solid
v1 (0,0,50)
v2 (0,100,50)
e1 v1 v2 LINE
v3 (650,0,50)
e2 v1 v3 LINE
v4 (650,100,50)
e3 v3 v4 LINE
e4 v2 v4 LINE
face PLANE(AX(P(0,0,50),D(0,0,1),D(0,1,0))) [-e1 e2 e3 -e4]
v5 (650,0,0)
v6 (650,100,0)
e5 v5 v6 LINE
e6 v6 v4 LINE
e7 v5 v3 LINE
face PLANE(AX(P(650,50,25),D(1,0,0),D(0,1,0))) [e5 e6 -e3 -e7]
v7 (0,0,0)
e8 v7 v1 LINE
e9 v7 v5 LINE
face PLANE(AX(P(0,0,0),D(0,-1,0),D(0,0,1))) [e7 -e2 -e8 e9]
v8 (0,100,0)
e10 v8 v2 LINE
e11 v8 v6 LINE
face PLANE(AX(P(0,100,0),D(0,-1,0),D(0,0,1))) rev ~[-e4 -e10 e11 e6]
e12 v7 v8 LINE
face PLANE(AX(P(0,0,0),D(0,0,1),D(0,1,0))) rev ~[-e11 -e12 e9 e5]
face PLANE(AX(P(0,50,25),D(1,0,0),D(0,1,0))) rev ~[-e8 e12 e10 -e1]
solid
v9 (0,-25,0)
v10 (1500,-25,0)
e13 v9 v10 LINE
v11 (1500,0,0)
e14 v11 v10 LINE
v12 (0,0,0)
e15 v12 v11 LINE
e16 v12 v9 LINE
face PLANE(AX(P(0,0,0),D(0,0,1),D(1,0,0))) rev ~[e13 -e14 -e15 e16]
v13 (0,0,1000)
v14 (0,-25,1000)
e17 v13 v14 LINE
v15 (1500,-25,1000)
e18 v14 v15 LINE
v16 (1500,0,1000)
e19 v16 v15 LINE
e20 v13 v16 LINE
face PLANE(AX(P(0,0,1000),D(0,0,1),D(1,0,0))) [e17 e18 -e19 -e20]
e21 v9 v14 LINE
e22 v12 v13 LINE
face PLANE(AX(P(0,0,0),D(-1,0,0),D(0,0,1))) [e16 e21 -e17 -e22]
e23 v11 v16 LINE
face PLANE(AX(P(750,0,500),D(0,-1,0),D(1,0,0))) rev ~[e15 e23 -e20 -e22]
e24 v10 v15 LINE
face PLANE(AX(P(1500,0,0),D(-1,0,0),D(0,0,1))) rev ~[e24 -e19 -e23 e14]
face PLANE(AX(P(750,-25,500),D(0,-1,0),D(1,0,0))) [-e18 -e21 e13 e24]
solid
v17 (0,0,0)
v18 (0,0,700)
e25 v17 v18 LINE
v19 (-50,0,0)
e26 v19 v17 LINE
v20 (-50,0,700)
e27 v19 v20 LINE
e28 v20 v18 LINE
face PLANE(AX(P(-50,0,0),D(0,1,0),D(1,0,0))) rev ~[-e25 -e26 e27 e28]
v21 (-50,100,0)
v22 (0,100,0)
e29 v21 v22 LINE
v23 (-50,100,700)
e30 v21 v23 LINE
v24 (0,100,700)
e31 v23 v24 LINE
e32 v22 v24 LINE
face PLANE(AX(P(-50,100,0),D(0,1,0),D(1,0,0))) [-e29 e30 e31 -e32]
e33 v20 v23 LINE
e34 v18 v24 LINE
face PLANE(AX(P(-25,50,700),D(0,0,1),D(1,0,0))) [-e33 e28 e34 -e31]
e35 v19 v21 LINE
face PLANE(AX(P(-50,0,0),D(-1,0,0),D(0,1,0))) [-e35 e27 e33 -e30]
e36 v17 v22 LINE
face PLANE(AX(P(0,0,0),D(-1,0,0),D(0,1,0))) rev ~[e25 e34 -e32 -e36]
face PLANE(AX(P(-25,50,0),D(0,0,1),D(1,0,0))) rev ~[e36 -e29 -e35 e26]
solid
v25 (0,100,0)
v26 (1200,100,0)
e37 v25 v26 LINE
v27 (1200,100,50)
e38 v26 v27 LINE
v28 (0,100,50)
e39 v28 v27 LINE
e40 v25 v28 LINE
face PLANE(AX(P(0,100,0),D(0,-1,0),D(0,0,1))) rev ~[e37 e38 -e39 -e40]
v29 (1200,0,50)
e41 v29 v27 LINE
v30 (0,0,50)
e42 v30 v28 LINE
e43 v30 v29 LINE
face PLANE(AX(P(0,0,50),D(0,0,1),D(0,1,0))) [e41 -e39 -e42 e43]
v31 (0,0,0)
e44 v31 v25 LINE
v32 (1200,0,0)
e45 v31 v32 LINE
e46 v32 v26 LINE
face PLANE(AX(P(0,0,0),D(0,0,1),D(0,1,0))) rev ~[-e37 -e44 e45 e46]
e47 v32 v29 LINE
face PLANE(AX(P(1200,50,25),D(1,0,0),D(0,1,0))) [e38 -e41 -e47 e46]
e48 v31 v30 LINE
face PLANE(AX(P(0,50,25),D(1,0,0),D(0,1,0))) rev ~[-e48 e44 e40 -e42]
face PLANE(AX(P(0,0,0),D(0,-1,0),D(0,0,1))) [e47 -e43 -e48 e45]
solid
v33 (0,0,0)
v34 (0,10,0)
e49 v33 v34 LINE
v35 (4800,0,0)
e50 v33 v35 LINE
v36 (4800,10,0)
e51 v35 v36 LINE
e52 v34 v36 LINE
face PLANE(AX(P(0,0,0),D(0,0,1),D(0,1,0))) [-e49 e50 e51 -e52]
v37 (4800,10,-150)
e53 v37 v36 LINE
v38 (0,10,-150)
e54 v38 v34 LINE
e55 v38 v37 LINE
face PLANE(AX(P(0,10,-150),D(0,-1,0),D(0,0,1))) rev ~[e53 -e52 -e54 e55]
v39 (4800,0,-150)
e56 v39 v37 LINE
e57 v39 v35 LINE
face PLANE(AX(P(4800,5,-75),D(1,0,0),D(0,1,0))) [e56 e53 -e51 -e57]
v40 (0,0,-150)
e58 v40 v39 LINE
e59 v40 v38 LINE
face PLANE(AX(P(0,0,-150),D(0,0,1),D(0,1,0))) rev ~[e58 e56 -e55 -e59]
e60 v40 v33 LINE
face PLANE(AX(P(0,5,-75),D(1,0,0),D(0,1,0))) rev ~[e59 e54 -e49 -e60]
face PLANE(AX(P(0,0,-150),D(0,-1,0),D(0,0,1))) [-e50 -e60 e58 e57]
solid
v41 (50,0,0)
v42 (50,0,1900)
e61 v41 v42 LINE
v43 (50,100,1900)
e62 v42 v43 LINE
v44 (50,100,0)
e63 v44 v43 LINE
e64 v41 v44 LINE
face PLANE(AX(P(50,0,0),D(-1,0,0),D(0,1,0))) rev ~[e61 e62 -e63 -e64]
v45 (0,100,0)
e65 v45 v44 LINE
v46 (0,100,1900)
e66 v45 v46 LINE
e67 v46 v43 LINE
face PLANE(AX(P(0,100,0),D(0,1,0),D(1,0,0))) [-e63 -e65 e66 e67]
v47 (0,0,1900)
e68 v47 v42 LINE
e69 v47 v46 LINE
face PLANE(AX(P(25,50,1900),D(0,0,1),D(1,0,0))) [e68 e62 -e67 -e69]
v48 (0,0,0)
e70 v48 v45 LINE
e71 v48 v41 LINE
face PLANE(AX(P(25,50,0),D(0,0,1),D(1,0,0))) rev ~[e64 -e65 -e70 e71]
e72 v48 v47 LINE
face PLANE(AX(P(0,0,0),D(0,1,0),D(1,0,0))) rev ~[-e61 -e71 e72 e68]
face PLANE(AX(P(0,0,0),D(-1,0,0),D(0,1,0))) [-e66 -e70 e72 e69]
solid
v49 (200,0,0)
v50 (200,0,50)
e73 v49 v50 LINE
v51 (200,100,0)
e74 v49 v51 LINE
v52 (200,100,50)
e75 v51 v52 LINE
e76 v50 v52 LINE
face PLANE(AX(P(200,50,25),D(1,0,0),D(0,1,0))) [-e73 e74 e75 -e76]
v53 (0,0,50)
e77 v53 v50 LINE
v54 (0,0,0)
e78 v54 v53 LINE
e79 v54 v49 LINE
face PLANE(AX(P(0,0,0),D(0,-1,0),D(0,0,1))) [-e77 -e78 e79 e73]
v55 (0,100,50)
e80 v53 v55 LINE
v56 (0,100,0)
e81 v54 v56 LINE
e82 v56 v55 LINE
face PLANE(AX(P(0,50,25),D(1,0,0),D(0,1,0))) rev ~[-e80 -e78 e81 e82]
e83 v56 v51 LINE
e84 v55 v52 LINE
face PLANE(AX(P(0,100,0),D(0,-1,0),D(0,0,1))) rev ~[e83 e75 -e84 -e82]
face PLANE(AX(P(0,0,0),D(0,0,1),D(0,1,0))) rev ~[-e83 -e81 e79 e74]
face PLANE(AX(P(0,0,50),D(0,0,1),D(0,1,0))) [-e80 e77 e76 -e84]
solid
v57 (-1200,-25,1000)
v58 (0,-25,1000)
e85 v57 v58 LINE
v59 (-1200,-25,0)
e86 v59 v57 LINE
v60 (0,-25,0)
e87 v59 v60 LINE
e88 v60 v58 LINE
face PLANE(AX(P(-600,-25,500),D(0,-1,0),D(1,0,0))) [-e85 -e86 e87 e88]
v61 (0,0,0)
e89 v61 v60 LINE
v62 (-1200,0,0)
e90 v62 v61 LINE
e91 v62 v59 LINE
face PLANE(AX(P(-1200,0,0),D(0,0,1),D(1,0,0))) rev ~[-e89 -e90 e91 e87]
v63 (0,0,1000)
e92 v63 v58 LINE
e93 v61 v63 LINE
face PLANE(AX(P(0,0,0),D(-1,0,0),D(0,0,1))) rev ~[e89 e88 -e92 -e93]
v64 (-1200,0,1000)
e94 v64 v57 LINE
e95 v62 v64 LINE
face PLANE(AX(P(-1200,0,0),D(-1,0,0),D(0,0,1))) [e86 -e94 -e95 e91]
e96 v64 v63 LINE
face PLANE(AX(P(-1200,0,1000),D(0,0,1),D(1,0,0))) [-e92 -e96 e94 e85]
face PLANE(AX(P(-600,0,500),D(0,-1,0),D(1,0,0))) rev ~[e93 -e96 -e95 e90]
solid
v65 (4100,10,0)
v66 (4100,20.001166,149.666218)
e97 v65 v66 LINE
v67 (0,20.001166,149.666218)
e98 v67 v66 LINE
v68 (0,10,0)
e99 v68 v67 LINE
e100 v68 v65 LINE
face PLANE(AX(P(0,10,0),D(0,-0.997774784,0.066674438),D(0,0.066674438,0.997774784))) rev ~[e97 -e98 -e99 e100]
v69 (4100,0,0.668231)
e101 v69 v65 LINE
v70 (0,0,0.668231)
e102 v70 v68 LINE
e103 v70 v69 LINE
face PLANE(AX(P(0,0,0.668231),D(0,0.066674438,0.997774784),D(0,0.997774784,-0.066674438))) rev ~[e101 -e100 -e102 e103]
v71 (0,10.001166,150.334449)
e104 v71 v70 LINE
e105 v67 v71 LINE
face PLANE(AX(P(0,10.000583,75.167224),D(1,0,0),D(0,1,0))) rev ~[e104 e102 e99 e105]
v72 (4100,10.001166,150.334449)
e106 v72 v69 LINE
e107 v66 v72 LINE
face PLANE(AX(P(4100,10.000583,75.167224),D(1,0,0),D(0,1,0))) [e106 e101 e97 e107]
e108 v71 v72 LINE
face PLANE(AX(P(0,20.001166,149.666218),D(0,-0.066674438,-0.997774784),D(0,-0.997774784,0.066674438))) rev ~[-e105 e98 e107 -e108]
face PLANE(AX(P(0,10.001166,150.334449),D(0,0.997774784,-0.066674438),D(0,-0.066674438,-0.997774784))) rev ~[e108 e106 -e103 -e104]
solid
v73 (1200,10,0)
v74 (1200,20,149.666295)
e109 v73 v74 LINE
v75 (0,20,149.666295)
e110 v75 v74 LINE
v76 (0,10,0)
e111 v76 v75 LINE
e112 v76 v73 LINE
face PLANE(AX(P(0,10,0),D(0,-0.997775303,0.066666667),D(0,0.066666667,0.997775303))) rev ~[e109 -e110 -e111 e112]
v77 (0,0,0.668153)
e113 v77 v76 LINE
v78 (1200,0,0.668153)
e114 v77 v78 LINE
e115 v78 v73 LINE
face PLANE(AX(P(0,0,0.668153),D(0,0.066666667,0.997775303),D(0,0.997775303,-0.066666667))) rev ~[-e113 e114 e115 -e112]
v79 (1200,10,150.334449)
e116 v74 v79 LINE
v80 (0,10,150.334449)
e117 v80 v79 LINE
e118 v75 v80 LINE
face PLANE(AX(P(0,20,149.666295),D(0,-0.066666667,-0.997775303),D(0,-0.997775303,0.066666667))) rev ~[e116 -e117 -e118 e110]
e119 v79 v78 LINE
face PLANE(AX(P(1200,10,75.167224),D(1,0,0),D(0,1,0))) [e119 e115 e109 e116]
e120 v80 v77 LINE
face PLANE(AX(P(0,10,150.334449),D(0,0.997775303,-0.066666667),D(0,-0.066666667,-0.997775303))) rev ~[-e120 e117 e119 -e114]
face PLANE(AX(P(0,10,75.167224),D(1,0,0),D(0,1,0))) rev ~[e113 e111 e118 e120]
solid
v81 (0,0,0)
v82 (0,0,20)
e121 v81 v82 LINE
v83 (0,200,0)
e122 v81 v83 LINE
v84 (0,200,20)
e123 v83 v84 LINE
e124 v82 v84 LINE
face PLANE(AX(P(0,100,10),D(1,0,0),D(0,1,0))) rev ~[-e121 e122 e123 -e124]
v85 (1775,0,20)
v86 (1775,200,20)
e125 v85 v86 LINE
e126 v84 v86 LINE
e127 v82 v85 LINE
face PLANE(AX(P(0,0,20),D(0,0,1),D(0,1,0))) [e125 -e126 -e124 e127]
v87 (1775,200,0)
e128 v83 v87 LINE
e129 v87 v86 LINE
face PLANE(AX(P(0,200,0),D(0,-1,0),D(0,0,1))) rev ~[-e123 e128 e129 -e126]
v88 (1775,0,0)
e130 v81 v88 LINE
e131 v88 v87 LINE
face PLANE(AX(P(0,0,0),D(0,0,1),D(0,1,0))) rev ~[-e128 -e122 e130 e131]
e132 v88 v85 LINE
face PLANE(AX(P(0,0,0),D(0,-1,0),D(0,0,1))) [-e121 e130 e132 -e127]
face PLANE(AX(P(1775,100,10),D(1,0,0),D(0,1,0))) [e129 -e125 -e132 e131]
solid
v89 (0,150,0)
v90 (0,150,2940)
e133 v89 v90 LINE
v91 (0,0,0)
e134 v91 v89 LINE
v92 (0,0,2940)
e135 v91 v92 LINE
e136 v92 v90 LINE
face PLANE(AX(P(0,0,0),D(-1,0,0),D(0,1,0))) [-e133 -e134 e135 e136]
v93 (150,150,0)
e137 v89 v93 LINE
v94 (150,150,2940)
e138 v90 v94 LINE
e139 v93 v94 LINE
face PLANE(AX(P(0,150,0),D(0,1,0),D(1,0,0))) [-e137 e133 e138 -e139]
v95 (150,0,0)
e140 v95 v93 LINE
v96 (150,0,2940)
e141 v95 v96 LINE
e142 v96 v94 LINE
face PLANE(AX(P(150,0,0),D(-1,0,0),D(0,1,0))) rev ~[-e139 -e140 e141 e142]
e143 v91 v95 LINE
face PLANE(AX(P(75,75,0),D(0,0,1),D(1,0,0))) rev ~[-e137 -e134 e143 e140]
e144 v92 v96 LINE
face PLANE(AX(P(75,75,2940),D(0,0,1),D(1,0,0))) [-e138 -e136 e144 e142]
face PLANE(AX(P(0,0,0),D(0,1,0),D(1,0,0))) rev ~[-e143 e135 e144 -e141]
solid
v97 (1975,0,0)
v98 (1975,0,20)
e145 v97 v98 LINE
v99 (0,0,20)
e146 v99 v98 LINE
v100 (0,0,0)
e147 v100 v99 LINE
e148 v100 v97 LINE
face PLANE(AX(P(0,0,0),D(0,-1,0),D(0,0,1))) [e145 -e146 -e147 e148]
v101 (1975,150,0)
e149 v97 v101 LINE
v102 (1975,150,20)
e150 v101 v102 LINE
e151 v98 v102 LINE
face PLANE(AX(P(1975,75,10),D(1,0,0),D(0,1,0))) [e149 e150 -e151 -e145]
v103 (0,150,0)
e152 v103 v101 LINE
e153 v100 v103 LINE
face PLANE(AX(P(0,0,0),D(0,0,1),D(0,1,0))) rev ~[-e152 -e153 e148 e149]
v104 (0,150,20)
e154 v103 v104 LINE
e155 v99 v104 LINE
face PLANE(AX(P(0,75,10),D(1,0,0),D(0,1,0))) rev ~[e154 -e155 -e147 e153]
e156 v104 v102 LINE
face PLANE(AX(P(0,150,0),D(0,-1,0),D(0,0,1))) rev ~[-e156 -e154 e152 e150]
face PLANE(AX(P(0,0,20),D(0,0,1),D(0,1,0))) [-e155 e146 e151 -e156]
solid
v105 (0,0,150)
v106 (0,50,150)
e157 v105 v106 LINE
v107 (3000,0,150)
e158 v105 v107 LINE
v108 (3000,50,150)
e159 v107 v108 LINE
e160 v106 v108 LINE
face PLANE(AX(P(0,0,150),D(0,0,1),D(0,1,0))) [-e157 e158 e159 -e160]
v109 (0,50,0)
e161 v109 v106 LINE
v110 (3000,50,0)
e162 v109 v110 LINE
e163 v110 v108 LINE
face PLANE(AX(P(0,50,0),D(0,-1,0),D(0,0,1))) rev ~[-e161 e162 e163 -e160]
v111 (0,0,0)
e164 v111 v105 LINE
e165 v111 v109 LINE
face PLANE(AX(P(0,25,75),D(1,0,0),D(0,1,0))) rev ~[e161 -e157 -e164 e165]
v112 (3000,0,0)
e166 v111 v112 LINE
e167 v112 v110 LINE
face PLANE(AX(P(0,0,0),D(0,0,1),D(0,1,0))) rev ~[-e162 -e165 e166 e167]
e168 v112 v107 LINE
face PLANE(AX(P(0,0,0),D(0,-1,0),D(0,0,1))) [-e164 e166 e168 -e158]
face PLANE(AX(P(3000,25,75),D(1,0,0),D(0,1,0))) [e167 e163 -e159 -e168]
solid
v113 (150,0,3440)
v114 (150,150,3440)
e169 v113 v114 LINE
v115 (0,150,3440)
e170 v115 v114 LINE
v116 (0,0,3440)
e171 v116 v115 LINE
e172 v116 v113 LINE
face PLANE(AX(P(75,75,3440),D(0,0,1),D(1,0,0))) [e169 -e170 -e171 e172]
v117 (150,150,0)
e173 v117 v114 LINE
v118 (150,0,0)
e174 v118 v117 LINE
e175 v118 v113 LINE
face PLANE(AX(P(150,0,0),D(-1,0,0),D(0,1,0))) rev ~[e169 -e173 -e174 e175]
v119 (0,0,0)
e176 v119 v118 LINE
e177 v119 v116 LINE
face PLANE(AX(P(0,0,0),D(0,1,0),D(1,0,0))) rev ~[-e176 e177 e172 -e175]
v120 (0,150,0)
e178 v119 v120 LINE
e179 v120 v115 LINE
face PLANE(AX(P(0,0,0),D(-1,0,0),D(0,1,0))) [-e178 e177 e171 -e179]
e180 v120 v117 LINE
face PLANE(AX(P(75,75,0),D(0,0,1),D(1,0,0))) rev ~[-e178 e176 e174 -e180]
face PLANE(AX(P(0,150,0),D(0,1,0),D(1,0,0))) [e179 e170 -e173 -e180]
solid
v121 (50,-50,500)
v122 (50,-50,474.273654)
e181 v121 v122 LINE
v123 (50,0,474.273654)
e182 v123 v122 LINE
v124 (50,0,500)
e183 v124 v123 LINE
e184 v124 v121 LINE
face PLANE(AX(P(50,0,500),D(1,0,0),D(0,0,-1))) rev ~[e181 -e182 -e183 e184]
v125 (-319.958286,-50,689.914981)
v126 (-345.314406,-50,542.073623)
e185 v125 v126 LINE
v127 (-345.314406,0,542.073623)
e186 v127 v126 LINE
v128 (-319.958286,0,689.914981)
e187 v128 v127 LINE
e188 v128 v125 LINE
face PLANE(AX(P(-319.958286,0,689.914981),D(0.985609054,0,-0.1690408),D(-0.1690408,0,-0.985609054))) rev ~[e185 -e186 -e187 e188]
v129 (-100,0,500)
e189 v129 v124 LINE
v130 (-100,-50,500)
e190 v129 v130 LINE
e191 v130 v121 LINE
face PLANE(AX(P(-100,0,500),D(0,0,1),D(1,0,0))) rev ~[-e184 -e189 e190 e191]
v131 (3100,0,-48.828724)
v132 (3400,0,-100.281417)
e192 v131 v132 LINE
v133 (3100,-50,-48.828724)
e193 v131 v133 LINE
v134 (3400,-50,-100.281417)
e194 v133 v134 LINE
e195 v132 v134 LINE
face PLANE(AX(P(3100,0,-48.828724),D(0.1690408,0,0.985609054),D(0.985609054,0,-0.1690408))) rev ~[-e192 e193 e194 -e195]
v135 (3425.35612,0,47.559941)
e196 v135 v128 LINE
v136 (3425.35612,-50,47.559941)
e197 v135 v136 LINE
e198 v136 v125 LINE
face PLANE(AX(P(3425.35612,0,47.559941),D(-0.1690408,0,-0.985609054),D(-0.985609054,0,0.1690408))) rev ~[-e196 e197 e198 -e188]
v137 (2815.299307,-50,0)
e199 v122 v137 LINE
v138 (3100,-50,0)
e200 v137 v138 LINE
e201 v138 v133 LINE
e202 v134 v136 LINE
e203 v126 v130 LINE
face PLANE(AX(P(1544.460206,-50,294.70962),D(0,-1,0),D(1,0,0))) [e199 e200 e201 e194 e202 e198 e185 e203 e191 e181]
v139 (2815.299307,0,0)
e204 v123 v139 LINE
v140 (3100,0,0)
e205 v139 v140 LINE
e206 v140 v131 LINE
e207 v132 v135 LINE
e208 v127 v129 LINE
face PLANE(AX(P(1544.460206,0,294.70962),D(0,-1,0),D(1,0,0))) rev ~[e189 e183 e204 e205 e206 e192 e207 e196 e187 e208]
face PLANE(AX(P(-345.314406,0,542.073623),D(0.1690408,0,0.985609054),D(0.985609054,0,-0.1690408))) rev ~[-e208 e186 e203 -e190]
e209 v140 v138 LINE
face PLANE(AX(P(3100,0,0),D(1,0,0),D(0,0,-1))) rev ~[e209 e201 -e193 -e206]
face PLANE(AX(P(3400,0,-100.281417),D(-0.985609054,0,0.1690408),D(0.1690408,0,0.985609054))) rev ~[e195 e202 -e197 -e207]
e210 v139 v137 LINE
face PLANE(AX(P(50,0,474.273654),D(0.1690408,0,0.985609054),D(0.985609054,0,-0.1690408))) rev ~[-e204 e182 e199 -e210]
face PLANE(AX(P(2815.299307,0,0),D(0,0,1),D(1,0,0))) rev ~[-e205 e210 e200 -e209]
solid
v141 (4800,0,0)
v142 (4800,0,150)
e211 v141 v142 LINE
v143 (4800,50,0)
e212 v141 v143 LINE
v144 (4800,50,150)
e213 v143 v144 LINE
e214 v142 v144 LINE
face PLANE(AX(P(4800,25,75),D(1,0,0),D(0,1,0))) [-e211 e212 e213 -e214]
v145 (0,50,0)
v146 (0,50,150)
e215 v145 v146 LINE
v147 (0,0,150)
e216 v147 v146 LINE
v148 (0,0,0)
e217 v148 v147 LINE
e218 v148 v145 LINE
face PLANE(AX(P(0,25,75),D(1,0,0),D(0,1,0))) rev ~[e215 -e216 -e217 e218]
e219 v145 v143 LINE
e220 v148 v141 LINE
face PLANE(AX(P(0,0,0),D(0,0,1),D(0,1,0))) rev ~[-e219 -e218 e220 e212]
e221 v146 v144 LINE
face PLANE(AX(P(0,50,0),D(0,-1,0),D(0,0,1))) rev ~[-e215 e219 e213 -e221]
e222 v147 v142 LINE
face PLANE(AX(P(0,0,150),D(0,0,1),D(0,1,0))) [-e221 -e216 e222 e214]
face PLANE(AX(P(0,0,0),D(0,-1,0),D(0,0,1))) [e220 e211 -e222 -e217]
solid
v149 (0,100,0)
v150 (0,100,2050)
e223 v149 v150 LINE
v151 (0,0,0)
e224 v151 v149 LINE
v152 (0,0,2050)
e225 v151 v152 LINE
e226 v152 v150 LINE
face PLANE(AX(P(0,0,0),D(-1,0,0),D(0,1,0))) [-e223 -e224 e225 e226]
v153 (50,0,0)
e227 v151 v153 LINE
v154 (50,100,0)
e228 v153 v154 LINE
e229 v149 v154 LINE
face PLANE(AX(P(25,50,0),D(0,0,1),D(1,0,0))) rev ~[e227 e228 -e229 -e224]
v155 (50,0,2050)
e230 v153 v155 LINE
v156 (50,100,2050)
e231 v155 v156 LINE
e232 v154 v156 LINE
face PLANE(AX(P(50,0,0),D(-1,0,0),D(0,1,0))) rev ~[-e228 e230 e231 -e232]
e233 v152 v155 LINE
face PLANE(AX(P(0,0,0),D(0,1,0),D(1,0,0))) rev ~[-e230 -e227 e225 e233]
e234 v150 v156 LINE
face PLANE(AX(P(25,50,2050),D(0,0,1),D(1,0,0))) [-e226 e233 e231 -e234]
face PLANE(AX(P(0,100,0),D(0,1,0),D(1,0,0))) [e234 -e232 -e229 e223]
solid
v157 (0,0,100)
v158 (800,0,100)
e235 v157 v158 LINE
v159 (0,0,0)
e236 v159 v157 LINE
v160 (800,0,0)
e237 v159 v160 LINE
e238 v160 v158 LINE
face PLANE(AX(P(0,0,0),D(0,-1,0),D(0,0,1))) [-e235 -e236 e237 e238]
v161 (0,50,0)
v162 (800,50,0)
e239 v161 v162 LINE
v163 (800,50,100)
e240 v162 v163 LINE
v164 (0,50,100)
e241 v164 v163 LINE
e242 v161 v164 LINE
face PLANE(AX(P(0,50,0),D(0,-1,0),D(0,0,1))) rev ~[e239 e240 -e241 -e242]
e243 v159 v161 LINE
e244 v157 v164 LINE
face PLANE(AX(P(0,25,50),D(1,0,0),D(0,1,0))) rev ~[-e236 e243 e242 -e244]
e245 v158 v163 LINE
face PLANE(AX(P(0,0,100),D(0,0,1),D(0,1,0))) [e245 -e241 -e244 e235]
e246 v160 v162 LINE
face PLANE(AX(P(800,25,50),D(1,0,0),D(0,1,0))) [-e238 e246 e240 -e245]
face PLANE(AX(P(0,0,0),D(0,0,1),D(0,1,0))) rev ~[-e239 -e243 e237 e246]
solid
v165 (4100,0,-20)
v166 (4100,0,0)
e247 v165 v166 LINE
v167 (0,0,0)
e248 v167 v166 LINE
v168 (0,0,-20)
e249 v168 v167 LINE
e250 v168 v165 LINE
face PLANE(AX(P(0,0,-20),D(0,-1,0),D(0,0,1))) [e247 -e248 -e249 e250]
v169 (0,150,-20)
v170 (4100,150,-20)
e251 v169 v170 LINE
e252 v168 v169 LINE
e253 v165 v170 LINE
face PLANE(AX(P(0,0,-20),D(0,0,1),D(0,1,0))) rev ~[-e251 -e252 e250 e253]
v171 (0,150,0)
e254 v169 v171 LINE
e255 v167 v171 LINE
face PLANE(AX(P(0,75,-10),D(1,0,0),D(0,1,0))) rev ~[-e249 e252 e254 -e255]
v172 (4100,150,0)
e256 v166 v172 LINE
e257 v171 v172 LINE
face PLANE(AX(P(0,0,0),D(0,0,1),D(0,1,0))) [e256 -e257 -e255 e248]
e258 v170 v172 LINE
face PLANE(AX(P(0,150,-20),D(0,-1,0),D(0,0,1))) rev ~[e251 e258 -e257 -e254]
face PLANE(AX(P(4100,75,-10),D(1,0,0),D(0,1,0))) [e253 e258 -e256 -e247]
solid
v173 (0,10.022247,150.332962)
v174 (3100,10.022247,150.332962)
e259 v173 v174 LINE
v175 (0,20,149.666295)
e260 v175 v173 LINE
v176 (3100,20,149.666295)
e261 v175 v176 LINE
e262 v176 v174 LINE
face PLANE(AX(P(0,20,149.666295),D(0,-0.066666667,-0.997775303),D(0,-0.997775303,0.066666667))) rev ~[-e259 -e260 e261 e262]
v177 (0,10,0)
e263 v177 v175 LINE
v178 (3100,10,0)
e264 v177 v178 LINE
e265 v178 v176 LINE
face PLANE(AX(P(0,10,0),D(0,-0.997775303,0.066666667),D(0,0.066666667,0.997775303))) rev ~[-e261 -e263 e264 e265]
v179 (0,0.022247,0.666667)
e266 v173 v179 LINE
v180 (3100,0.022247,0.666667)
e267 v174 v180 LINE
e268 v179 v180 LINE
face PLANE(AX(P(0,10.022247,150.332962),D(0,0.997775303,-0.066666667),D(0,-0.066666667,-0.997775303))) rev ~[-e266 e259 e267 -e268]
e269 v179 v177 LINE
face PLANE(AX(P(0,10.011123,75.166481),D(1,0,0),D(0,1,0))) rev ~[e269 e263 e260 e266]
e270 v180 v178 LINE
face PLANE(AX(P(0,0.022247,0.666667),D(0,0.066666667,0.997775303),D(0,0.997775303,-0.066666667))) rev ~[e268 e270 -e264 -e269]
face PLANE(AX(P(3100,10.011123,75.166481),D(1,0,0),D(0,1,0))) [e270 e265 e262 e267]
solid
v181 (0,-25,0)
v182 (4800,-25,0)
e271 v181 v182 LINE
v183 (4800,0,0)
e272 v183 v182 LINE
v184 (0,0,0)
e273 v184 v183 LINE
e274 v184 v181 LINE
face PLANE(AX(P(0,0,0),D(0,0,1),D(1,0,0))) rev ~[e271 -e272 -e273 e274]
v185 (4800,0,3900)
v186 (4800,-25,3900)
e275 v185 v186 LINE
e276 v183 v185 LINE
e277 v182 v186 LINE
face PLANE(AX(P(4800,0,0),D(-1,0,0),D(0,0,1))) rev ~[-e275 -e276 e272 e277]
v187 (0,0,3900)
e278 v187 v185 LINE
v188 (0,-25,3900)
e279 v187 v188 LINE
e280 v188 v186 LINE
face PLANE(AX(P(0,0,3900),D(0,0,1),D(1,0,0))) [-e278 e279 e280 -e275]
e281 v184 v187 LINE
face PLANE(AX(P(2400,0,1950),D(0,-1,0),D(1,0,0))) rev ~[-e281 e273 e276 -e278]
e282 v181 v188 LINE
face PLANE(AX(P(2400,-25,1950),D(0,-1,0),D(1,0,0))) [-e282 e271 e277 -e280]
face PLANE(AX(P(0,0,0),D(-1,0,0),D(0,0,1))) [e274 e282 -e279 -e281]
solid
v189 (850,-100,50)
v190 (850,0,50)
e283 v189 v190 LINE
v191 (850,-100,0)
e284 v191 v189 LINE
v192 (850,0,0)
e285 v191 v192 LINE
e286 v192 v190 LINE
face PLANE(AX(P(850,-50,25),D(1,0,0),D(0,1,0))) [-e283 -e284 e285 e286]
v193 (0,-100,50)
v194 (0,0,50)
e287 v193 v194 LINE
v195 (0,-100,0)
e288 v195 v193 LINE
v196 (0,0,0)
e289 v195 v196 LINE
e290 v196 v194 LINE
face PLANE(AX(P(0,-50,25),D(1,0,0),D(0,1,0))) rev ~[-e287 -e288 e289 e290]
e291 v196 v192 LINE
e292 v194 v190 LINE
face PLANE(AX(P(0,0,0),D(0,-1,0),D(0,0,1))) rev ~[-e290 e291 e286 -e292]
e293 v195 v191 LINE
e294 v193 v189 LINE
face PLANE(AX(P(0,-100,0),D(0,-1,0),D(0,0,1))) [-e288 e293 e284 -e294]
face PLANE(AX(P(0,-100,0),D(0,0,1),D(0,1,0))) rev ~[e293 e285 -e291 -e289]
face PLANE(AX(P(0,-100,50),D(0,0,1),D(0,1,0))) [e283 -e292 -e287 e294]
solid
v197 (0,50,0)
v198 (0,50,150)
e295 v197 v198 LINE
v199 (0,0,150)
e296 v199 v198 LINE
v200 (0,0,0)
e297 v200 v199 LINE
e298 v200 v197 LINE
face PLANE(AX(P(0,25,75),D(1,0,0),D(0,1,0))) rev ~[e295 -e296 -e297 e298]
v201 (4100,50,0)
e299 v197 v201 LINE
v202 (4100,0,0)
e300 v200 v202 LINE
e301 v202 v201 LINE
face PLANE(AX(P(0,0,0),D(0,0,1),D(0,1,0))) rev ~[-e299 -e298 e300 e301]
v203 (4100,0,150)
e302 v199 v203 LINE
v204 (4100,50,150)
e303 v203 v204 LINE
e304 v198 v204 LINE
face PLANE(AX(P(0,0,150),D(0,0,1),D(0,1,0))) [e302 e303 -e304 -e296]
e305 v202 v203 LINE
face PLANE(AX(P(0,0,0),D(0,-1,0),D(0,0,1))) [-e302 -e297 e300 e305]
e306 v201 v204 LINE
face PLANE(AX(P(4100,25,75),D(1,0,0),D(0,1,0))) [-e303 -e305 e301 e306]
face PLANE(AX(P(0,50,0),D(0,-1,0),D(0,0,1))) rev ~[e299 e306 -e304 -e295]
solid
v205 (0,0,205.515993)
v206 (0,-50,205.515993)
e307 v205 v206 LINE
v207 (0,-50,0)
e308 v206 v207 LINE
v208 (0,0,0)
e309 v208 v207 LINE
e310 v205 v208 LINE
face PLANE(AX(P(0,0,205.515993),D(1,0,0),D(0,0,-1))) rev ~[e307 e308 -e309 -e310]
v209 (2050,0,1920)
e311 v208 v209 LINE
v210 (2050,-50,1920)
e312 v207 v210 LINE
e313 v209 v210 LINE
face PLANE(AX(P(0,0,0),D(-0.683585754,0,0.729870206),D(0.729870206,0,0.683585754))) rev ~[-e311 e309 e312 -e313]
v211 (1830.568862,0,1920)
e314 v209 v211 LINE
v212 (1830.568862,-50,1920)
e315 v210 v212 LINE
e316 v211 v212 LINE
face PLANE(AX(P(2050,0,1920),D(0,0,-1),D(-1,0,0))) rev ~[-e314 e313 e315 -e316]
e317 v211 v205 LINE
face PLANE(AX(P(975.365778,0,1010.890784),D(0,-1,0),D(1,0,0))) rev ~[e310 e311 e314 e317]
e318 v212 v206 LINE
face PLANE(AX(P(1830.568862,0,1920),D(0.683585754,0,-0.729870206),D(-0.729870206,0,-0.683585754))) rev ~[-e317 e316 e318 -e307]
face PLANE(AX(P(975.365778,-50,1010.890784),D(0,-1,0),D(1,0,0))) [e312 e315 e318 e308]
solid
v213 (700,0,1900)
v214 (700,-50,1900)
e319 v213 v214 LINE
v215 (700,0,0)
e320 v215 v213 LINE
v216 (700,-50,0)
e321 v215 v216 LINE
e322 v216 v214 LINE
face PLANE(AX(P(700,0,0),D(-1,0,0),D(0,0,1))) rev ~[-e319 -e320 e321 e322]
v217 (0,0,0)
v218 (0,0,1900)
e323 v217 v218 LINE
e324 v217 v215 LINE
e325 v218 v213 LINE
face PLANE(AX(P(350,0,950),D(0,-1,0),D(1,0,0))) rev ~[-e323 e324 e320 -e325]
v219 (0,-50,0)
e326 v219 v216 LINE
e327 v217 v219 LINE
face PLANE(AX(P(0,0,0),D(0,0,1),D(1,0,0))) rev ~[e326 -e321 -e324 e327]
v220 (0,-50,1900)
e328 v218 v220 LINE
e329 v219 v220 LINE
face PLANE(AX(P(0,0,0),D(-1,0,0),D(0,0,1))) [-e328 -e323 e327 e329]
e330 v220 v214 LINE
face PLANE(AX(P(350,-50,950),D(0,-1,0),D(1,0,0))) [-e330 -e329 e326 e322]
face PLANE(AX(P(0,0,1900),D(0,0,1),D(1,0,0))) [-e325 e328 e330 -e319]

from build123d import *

# Parameters (mm, degrees)
F0_W      = 150
F0_H      = 150
F1_DEPTH  = 3440
F2_W      = 150
F2_H      = 150
F3_DEPTH  = 2940
F4_W      = 50
F4_H      = 150
F5_DEPTH  = 4100
F6_W      = 50
F6_H      = 150
F7_DEPTH  = 3000
F8_W      = 50
F8_H      = 150
F9_DEPTH  = 4800
F10_W     = 150
F10_H     = 20
F11_DEPTH = 4100
F12_W     = 200
F12_H     = 20
F13_DEPTH = 1775
F16_W     = 150
F16_H     = 20
F17_DEPTH = 1975
F19_DEPTH = 50
F21_DEPTH = 4100
F23_DEPTH = 3100
F24_W     = 4800
F24_H     = 3900
F25_DEPTH = 25
F26_W     = 700
F26_H     = 1900
F27_DEPTH = 50
F28_W     = 1500
F28_H     = 1000
F29_DEPTH = 25
F30_W     = 50
F30_H     = 100
F31_DEPTH = 2050
F32_W     = 50
F32_H     = 100
F33_DEPTH = 1900
F34_W     = 50
F34_H     = 100
F35_DEPTH = 800
F36_W     = 50
F36_H     = 100
F37_DEPTH = 700
F38_W     = 100
F38_H     = 50
F39_DEPTH = 1200
F40_W     = 100
F40_H     = 50
F41_DEPTH = 200
F43_DEPTH = 50
F44_W     = 100
F44_H     = 50
F45_DEPTH = 850
F46_W     = 100
F46_H     = 50
F47_DEPTH = 650
F49_DEPTH = 1200
F50_W     = 10
F50_H     = 150
F51_DEPTH = 4800
F52_W     = 1200
F52_H     = 1000
F53_DEPTH = 25


# Not quite as in the source:
# - a feature names something its author has since deleted; it is built from what else it names


with BuildPart() as f1:
    # F0 (on Top) → F1 (new body)
    with BuildSketch(Plane.XY):
        with Locations((75, 75)):
            Rectangle(F0_W, F0_H)
    extrude(amount=F1_DEPTH)


with BuildPart() as f3:
    # F2 (on Top) → F3 (new body)
    with BuildSketch(Plane.XY):
        with Locations((75, 75)):
            Rectangle(F2_W, F2_H)
    extrude(amount=F3_DEPTH)


with BuildPart() as f5:
    # F4 (on Right) → F5 (new body)
    with BuildSketch(Plane.YZ):
        with Locations((25, 75)):
            Rectangle(F4_W, F4_H)
    extrude(amount=F5_DEPTH)


with BuildPart() as f7:
    # F6 (on Right) → F7 (new body)
    with BuildSketch(Plane.YZ):
        with Locations((25, 75)):
            Rectangle(F6_W, F6_H)
    extrude(amount=F7_DEPTH)


with BuildPart() as f9:
    # F8 (on Right) → F9 (new body)
    with BuildSketch(Plane.YZ):
        with Locations((25, 75)):
            Rectangle(F8_W, F8_H)
    extrude(amount=F9_DEPTH)


with BuildPart() as f11:
    # F10 (on Right) → F11 (new body)
    with BuildSketch(Plane.YZ):
        with Locations((75, -10)):
            Rectangle(F10_W, F10_H)
    extrude(amount=F11_DEPTH)


with BuildPart() as f13:
    # F12 (on Right) → F13 (new body)
    with BuildSketch(Plane.YZ):
        with Locations((100, 10)):
            Rectangle(F12_W, F12_H)
    extrude(amount=F13_DEPTH)


with BuildPart() as f14_1:
    # F14: copy of F13
    add(f13.part)


with BuildPart() as f17:
    # F16 (on Right) → F17 (new body)
    with BuildSketch(Plane.YZ):
        with Locations((75, 10)):
            Rectangle(F16_W, F16_H)
    extrude(amount=F17_DEPTH)


with BuildPart() as f19:
    # F18 (on Front) → F19 (new body)
    with BuildSketch(Plane.XZ):
        Polygon((2815.2993068946, 0), (2899.6957839059, 0), (3050, 0), (3100, 0), (3100, -48.8287244524), (3400, -100.2814173698), (3425.3561200039, 47.5599407758), (3396.9886494943, 52.4252166057), (-319.9582863525, 689.9149808739), (-345.3144063564, 542.0736227282), (-100, 500), (0, 500), (50, 500), (50, 474.2736535413), align=None)
    extrude(amount=F19_DEPTH)


with BuildPart() as f21:
    # F20 (on Right) → F21 (new body)
    with BuildSketch(Plane.YZ):
        Polygon((0, 0.6682313415), (10, 0), (20.0011657345, 149.6662175775), (10.0011657345, 150.334448919), align=None)
    extrude(amount=F21_DEPTH)


with BuildPart() as f23:
    # F22 (on Right) → F23 (new body)
    with BuildSketch(Plane.YZ):
        Polygon((0.0222469686, 0.6666666667), (10, 0), (20, 149.666295471), (10.0222469686, 150.3329621376), align=None)
    extrude(amount=F23_DEPTH)


with BuildPart() as f25:
    # F24 (on Front) → F25 (new body)
    with BuildSketch(Plane.XZ):
        with Locations((2400, 1950)):
            Rectangle(F24_W, F24_H)
    extrude(amount=F25_DEPTH)


with BuildPart() as f27:
    # F26 (on Front) → F27 (new body)
    with BuildSketch(Plane.XZ):
        with Locations((350, 950)):
            Rectangle(F26_W, F26_H)
    extrude(amount=F27_DEPTH)


with BuildPart() as f29:
    # F28 (on Front) → F29 (new body)
    with BuildSketch(Plane.XZ):
        with Locations((750, 500)):
            Rectangle(F28_W, F28_H)
    extrude(amount=F29_DEPTH)


with BuildPart() as f31:
    # F30 (on Top) → F31 (new body)
    with BuildSketch(Plane.XY):
        with Locations((25, 50)):
            Rectangle(F30_W, F30_H)
    extrude(amount=F31_DEPTH)


with BuildPart() as f33:
    # F32 (on Top) → F33 (new body)
    with BuildSketch(Plane.XY):
        with Locations((25, 50)):
            Rectangle(F32_W, F32_H)
    extrude(amount=F33_DEPTH)


with BuildPart() as f35:
    # F34 (on Right) → F35 (new body)
    with BuildSketch(Plane.YZ):
        with Locations((25, 50)):
            Rectangle(F34_W, F34_H)
    extrude(amount=F35_DEPTH)


with BuildPart() as f37:
    # F36 (on Top) → F37 (new body)
    with BuildSketch(Plane.XY):
        with Locations((-25, 50)):
            Rectangle(F36_W, F36_H)
    extrude(amount=F37_DEPTH)


with BuildPart() as f39:
    # F38 (on Right) → F39 (new body)
    with BuildSketch(Plane.YZ):
        with Locations((50, 25)):
            Rectangle(F38_W, F38_H)
    extrude(amount=F39_DEPTH)


with BuildPart() as f41:
    # F40 (on Right) → F41 (new body)
    with BuildSketch(Plane.YZ):
        with Locations((50, 25)):
            Rectangle(F40_W, F40_H)
    extrude(amount=F41_DEPTH)


with BuildPart() as f43:
    # F42 (on Front) → F43 (new body)
    with BuildSketch(Plane.XZ):
        Polygon((2050, 1920), (1830.5688617947, 1920), (0, 205.5159928557), (0, 0), align=None)
    extrude(amount=F43_DEPTH)


with BuildPart() as f45:
    # F44 (on Right) → F45 (new body)
    with BuildSketch(Plane.YZ):
        with Locations((-50, 25)):
            Rectangle(F44_W, F44_H)
    extrude(amount=F45_DEPTH)


with BuildPart() as f47:
    # F46 (on Right) → F47 (new body)
    with BuildSketch(Plane.YZ):
        with Locations((50, 25)):
            Rectangle(F46_W, F46_H)
    extrude(amount=F47_DEPTH)


with BuildPart() as f49:
    # F48 (on Right) → F49 (new body)
    with BuildSketch(Plane.YZ):
        Polygon((0, 0.6681531048), (10, 0), (20, 149.666295471), (10, 150.3344485757), align=None)
    extrude(amount=F49_DEPTH)


with BuildPart() as f51:
    # F50 (on Right) → F51 (new body)
    with BuildSketch(Plane.YZ):
        with Locations((5, -75)):
            Rectangle(F50_W, F50_H)
    extrude(amount=F51_DEPTH)


with BuildPart() as f53:
    # F52 (on Front) → F53 (new body)
    with BuildSketch(Plane.XZ):
        with Locations((-600, 500)):
            Rectangle(F52_W, F52_H)
    extrude(amount=F53_DEPTH)


solid = Compound([f1.part, f3.part, f5.part, f7.part, f9.part, f11.part, f13.part, f17.part, f19.part, f21.part, f23.part, f25.part, f27.part, f29.part, f31.part, f33.part, f35.part, f37.part, f39.part, f41.part, f43.part, f45.part, f47.part, f49.part, f51.part, f53.part])
